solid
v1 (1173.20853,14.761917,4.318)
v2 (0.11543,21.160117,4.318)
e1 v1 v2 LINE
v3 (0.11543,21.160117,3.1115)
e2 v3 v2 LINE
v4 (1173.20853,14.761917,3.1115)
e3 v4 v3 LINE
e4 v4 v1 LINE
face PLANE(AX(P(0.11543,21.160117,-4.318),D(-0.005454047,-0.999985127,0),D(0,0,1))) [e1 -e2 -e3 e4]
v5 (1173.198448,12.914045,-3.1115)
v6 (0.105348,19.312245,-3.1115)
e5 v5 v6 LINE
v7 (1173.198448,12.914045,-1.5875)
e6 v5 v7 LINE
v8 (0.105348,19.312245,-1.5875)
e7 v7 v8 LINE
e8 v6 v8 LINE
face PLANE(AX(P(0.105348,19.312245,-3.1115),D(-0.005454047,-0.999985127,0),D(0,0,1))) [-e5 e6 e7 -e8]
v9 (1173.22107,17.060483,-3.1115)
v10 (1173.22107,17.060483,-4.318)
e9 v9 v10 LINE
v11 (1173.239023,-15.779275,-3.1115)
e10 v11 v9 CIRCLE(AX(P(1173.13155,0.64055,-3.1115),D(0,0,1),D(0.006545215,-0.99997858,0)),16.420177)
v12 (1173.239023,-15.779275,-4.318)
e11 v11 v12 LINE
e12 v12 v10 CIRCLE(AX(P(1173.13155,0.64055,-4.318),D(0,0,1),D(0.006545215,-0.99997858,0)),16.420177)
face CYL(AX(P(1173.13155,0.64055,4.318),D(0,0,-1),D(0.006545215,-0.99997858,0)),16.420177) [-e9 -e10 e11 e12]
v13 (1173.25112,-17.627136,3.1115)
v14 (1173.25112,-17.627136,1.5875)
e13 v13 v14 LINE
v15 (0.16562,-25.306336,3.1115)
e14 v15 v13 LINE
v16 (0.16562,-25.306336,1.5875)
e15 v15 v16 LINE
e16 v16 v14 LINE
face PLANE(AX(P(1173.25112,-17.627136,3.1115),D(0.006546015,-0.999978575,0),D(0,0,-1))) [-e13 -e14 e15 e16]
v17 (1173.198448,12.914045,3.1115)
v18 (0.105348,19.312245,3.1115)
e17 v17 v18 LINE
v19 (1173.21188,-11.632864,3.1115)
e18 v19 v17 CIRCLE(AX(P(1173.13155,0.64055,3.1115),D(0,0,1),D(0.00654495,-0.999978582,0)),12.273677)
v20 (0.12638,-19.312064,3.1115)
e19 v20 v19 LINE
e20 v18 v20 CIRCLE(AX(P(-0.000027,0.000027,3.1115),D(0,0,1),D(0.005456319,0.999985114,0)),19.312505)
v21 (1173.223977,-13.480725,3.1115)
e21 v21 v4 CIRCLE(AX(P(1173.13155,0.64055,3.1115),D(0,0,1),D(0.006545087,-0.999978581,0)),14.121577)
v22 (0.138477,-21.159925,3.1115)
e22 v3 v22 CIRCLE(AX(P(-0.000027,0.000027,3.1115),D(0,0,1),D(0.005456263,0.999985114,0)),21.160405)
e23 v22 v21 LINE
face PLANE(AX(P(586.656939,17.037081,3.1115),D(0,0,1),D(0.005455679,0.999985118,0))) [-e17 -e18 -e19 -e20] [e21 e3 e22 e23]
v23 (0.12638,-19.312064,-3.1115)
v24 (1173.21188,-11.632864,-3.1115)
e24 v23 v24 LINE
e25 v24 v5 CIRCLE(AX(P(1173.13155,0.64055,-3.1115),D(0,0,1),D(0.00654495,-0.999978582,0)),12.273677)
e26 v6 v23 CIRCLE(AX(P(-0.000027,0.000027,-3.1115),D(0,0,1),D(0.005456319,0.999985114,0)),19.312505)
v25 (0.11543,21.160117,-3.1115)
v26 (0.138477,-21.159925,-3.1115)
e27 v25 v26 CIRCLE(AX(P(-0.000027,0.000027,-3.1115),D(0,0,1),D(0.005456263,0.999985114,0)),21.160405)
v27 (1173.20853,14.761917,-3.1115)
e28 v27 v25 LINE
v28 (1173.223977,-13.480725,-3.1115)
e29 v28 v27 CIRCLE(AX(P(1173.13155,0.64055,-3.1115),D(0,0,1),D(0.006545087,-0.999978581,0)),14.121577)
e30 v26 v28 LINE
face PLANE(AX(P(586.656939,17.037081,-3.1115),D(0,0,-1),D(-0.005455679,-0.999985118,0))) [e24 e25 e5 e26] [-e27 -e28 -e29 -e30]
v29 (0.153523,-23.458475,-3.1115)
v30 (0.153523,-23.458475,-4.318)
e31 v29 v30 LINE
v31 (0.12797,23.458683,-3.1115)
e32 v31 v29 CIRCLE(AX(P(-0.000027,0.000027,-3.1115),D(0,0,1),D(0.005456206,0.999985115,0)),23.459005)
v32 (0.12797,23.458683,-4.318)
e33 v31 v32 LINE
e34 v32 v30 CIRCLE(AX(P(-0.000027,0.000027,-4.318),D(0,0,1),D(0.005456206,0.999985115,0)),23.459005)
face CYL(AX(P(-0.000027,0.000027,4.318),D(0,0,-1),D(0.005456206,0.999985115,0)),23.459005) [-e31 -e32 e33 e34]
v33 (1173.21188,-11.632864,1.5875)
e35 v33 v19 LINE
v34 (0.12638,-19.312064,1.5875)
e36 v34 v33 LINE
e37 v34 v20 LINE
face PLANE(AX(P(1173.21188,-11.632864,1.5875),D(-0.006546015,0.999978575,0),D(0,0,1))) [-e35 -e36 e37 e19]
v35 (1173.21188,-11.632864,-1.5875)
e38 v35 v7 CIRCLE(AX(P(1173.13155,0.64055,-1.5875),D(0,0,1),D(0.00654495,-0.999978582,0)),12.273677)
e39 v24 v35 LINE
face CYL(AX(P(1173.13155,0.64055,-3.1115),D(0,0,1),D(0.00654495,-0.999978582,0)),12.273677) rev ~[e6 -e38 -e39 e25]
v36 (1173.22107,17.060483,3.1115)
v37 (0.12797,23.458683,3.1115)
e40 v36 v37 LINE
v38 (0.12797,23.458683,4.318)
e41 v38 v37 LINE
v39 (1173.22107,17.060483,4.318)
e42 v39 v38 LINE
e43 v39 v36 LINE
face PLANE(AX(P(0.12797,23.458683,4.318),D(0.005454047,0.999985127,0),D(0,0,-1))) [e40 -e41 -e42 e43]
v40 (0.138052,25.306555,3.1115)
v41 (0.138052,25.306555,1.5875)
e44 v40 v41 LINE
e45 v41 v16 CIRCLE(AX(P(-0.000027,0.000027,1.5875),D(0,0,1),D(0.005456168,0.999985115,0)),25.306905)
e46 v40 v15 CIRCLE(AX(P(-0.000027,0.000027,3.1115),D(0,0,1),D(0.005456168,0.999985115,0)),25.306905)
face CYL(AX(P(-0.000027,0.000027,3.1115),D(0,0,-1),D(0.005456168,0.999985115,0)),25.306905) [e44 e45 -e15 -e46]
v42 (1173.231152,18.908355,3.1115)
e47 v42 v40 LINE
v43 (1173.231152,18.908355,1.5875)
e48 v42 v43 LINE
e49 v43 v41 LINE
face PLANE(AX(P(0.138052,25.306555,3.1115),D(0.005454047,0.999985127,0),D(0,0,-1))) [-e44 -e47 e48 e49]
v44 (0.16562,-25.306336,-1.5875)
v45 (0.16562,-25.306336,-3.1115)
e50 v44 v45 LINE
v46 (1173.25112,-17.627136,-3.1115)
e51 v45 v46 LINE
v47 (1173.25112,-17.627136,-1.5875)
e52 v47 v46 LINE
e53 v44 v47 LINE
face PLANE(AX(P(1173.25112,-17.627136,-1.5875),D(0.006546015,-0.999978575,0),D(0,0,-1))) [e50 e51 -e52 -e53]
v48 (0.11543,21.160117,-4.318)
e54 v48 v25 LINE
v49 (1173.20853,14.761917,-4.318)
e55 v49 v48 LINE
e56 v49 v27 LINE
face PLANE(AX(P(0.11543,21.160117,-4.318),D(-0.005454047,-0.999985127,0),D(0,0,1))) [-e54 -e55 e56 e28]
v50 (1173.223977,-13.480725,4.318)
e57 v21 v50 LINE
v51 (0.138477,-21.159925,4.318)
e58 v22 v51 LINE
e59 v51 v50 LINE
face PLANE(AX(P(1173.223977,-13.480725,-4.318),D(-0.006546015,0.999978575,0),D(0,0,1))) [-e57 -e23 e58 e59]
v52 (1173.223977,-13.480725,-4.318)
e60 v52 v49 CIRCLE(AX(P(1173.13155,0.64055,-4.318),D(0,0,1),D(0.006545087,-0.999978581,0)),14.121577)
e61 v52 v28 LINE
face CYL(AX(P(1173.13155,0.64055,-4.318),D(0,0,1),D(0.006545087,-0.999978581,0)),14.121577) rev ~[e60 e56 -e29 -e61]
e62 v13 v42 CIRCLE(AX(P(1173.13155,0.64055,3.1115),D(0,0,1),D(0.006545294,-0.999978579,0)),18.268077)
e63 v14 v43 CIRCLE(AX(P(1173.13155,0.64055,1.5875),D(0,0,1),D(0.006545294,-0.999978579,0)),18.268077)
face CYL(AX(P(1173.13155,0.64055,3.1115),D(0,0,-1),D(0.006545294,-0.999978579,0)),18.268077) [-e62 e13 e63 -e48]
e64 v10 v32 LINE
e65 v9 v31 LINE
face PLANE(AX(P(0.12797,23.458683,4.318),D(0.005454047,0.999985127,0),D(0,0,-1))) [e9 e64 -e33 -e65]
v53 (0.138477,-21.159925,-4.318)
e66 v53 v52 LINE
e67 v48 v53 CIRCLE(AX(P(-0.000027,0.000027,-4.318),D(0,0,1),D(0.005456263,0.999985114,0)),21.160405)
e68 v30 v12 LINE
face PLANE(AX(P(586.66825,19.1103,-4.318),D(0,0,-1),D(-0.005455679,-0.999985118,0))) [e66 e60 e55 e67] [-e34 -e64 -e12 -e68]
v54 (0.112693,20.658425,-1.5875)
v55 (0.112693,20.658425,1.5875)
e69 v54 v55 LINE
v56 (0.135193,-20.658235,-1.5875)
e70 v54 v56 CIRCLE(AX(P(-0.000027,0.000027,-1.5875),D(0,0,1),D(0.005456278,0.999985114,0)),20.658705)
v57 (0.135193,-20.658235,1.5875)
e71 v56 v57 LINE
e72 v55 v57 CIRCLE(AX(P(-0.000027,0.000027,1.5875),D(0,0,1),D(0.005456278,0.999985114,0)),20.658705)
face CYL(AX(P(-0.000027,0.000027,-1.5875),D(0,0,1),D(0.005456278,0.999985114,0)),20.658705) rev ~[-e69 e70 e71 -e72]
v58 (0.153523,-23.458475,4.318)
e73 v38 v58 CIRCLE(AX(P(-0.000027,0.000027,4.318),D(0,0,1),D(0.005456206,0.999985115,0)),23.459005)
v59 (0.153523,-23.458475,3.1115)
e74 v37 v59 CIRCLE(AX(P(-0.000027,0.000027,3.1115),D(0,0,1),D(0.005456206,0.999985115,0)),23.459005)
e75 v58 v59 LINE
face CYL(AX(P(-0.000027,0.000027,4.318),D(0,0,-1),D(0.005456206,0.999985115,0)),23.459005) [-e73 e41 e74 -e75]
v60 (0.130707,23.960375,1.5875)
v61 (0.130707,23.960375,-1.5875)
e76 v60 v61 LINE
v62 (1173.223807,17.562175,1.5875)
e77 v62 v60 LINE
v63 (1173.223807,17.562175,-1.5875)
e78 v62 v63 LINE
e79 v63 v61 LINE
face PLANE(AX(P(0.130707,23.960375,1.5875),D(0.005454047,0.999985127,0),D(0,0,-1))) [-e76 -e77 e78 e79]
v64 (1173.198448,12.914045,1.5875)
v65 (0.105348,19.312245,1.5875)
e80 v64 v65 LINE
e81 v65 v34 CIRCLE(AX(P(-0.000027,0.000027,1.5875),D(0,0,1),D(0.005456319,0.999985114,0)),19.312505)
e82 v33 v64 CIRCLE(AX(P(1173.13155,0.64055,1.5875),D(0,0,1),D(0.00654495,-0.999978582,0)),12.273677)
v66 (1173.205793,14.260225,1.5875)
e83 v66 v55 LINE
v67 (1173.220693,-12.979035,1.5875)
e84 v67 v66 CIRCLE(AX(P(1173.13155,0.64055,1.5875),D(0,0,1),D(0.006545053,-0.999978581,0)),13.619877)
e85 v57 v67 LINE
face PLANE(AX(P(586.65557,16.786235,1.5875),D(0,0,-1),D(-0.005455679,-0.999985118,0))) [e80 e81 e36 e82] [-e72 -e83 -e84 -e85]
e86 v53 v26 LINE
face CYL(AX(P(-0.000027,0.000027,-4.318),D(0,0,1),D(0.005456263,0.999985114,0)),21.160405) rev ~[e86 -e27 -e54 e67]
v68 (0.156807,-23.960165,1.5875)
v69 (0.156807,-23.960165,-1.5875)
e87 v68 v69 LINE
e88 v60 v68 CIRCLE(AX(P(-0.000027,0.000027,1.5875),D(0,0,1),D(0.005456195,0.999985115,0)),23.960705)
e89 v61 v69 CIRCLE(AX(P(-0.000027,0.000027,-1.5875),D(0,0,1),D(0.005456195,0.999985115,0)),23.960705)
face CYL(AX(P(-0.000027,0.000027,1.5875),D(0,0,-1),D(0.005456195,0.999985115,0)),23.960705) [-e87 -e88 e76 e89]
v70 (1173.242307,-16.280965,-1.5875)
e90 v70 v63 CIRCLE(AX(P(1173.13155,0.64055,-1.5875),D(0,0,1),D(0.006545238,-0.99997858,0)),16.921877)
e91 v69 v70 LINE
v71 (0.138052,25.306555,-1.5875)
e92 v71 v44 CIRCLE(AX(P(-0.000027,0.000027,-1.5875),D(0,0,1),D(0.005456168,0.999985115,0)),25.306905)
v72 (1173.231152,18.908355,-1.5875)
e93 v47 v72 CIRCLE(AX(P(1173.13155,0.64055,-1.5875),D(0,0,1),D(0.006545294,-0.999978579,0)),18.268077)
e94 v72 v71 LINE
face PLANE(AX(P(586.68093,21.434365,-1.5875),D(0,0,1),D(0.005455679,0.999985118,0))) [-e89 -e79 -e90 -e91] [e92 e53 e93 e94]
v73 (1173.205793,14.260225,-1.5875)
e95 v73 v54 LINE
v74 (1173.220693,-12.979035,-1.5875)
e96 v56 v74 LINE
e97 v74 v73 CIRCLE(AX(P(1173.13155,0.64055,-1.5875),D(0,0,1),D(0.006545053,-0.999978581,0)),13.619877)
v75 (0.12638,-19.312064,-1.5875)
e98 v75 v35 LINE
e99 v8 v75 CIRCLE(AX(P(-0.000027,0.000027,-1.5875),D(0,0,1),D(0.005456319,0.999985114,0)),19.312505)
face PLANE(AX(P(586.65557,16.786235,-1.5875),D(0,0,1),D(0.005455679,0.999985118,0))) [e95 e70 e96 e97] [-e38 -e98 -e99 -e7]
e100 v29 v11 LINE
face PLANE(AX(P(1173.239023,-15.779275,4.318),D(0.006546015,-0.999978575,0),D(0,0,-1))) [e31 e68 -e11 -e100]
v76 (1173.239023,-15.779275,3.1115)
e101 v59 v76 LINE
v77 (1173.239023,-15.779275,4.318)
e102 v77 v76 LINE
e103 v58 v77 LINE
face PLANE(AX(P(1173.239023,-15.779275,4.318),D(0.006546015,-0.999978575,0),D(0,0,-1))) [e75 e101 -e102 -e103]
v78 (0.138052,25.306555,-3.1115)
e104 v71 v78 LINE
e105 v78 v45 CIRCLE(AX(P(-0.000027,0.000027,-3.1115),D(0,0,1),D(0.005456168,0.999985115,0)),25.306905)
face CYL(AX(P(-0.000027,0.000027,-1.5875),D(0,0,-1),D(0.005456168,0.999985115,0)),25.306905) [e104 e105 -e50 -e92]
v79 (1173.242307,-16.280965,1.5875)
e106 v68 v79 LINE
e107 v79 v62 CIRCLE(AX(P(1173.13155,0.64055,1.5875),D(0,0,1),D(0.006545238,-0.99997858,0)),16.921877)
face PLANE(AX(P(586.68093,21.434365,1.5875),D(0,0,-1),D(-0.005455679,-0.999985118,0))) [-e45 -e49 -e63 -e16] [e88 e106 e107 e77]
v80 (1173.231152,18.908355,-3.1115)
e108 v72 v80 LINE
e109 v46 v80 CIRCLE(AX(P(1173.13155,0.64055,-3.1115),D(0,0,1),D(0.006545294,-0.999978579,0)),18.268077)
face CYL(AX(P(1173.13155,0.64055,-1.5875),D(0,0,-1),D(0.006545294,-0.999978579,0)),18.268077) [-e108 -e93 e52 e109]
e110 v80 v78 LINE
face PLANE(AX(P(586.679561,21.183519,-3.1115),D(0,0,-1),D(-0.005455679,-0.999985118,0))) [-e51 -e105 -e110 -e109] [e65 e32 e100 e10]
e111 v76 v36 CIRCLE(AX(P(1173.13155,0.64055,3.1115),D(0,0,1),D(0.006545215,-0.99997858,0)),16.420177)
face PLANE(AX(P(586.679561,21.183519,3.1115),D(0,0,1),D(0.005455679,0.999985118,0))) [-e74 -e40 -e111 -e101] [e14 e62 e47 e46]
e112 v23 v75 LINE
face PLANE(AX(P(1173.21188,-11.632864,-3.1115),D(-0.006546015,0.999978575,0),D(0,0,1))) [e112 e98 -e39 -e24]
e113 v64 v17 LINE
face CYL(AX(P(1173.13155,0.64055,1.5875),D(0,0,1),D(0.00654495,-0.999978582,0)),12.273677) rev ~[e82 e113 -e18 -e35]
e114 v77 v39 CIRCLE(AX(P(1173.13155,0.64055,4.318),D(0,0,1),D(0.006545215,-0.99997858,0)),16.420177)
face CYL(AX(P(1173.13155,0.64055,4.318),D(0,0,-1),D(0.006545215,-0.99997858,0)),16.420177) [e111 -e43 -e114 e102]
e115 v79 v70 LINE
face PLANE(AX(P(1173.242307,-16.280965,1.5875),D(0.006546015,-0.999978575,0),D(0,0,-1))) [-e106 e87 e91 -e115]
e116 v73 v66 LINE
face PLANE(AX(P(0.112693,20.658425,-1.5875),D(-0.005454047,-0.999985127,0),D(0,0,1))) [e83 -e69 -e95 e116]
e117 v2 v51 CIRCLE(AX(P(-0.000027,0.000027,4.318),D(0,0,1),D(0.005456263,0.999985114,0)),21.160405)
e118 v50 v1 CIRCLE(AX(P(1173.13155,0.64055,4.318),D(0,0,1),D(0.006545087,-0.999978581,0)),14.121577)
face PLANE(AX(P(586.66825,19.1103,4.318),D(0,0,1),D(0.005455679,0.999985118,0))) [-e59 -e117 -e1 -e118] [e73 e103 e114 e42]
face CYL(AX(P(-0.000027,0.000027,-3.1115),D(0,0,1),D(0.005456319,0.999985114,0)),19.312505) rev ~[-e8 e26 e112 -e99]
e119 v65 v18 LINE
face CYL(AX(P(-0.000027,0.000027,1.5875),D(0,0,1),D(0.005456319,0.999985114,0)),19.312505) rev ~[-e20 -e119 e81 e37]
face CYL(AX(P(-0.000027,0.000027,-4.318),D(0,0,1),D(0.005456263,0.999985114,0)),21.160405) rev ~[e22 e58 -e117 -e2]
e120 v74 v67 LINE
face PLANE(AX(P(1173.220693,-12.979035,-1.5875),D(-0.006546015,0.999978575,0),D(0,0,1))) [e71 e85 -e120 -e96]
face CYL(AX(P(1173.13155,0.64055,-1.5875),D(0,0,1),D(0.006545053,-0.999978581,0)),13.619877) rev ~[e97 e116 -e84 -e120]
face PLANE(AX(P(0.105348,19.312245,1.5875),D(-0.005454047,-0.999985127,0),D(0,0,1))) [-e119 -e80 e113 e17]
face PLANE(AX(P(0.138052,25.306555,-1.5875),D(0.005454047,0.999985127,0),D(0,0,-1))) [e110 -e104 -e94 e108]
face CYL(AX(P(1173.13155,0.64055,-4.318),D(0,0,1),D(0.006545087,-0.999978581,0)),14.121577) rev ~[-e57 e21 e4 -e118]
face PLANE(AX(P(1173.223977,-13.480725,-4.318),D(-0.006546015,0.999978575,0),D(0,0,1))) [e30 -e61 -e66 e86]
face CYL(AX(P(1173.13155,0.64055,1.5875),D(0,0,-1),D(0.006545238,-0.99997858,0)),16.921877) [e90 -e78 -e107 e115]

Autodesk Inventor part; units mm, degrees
ref_plane "Work Plane2" through (0, 0, 0) normal (-1, 0, 0) x (0, 0, 1)
ref_plane "Work Plane3" through (1173.1316, 0.6405, 0) normal (-0.9944952, 0.1047817, 0) x (0, 0, 1)
sketch "Path" plane through (0, 0, 0) normal (0, 0, 1) x (1, 0, 0)
  arc A0 (0.1217, 22.3094) -> (0.146, -22.3092) centre (0, 0) ccw
  arc A1 (1173.2315, -14.63) -> (1173.2148, 15.9112) centre (1173.1316, 0.6405) ccw
  line L0 (1173.2315, -14.63) -> (0.146, -22.3092)
  line L1 (0.1217, 22.3094) -> (1173.2148, 15.9112)
  dimension "d31" = 5.9944
ref_plane "Section Plane" through (0.146, -22.3092, 0) normal (0.9999786, 0.006546, 0) x (0, 0, 1)
sketch "Section Sketch" plane through (0.146, -22.3092, 0) normal (0.9999786, 0.006546, 0) x (0, 0, 1)
  line L0 (-4.318, -1.1493) -> (4.318, -1.1493)
  line L1 (4.318, -1.1493) -> (4.318, 1.1493)
  line L2 (4.318, 1.1493) -> (-4.318, 1.1493)
  line L3 (-4.318, 1.1493) -> (-4.318, -1.1493)
  line L4 (-1.5875, -1.651) -> (1.5875, -1.651)
  line L5 (1.5875, -1.651) -> (1.5875, 1.651)
  line L6 (1.5875, 1.651) -> (-1.5875, 1.651)
  line L7 (-1.5875, 1.651) -> (-1.5875, -1.651)
  line L8 (-1.5875, 0) -> (1.5875, 0) construction
  line L9 (-3.1115, -2.9972) -> (-1.5875, -2.9972)
  line L10 (-1.5875, -2.9972) -> (-1.5875, 2.9972)
  line L11 (-1.5875, 2.9972) -> (-3.1115, 2.9972)
  line L12 (-3.1115, 2.9972) -> (-3.1115, -2.9972)
  line L13 (1.5875, -2.9972) -> (3.1115, -2.9972)
  line L14 (3.1115, -2.9972) -> (3.1115, 2.9972)
  line L15 (3.1115, 2.9972) -> (1.5875, 2.9972)
  line L16 (1.5875, 2.9972) -> (1.5875, -2.9972)
  line L17 (-4.318, 0) -> (4.318, 0) construction
  point P0 (0, 0)
  point P1 (0, 0)
  dimension "d21" = 2.2987
  dimension "d22" = 3.302
  dimension "d23" = 3.175
  dimension "d24" = 1.524
  dimension "d31" = 5.9944
  dimension "d32" = 8.636
sweep "Solid" add profiles "Section Sketch" path "Path"
pattern_of_one "Strand Pattern"
equation "\"d21\" = da_d2"
equation "\"d22\" = da_d1"
equation "\"d23\" = da_b1"
equation "\"d24\" = da_t1 + da_t2"
equation "\"d30\" = da_pt"
equation "\"da_p\" = 6.35"
equation "\"da_b1\" = 3.175"
equation "\"da_h2\" = 5.9944"
equation "\"da_h3\" = 5.207"
equation "\"da_d1\" = 3.302"
equation "\"da_d2\" = 2.2987"
equation "\"da_pt\" = 6.4008"
equation "\"da_b\" = 8.636"
equation "\"da_t1\" = 0.762"
equation "\"da_t2\" = 0.762"
properties part number "Roller Chain"
